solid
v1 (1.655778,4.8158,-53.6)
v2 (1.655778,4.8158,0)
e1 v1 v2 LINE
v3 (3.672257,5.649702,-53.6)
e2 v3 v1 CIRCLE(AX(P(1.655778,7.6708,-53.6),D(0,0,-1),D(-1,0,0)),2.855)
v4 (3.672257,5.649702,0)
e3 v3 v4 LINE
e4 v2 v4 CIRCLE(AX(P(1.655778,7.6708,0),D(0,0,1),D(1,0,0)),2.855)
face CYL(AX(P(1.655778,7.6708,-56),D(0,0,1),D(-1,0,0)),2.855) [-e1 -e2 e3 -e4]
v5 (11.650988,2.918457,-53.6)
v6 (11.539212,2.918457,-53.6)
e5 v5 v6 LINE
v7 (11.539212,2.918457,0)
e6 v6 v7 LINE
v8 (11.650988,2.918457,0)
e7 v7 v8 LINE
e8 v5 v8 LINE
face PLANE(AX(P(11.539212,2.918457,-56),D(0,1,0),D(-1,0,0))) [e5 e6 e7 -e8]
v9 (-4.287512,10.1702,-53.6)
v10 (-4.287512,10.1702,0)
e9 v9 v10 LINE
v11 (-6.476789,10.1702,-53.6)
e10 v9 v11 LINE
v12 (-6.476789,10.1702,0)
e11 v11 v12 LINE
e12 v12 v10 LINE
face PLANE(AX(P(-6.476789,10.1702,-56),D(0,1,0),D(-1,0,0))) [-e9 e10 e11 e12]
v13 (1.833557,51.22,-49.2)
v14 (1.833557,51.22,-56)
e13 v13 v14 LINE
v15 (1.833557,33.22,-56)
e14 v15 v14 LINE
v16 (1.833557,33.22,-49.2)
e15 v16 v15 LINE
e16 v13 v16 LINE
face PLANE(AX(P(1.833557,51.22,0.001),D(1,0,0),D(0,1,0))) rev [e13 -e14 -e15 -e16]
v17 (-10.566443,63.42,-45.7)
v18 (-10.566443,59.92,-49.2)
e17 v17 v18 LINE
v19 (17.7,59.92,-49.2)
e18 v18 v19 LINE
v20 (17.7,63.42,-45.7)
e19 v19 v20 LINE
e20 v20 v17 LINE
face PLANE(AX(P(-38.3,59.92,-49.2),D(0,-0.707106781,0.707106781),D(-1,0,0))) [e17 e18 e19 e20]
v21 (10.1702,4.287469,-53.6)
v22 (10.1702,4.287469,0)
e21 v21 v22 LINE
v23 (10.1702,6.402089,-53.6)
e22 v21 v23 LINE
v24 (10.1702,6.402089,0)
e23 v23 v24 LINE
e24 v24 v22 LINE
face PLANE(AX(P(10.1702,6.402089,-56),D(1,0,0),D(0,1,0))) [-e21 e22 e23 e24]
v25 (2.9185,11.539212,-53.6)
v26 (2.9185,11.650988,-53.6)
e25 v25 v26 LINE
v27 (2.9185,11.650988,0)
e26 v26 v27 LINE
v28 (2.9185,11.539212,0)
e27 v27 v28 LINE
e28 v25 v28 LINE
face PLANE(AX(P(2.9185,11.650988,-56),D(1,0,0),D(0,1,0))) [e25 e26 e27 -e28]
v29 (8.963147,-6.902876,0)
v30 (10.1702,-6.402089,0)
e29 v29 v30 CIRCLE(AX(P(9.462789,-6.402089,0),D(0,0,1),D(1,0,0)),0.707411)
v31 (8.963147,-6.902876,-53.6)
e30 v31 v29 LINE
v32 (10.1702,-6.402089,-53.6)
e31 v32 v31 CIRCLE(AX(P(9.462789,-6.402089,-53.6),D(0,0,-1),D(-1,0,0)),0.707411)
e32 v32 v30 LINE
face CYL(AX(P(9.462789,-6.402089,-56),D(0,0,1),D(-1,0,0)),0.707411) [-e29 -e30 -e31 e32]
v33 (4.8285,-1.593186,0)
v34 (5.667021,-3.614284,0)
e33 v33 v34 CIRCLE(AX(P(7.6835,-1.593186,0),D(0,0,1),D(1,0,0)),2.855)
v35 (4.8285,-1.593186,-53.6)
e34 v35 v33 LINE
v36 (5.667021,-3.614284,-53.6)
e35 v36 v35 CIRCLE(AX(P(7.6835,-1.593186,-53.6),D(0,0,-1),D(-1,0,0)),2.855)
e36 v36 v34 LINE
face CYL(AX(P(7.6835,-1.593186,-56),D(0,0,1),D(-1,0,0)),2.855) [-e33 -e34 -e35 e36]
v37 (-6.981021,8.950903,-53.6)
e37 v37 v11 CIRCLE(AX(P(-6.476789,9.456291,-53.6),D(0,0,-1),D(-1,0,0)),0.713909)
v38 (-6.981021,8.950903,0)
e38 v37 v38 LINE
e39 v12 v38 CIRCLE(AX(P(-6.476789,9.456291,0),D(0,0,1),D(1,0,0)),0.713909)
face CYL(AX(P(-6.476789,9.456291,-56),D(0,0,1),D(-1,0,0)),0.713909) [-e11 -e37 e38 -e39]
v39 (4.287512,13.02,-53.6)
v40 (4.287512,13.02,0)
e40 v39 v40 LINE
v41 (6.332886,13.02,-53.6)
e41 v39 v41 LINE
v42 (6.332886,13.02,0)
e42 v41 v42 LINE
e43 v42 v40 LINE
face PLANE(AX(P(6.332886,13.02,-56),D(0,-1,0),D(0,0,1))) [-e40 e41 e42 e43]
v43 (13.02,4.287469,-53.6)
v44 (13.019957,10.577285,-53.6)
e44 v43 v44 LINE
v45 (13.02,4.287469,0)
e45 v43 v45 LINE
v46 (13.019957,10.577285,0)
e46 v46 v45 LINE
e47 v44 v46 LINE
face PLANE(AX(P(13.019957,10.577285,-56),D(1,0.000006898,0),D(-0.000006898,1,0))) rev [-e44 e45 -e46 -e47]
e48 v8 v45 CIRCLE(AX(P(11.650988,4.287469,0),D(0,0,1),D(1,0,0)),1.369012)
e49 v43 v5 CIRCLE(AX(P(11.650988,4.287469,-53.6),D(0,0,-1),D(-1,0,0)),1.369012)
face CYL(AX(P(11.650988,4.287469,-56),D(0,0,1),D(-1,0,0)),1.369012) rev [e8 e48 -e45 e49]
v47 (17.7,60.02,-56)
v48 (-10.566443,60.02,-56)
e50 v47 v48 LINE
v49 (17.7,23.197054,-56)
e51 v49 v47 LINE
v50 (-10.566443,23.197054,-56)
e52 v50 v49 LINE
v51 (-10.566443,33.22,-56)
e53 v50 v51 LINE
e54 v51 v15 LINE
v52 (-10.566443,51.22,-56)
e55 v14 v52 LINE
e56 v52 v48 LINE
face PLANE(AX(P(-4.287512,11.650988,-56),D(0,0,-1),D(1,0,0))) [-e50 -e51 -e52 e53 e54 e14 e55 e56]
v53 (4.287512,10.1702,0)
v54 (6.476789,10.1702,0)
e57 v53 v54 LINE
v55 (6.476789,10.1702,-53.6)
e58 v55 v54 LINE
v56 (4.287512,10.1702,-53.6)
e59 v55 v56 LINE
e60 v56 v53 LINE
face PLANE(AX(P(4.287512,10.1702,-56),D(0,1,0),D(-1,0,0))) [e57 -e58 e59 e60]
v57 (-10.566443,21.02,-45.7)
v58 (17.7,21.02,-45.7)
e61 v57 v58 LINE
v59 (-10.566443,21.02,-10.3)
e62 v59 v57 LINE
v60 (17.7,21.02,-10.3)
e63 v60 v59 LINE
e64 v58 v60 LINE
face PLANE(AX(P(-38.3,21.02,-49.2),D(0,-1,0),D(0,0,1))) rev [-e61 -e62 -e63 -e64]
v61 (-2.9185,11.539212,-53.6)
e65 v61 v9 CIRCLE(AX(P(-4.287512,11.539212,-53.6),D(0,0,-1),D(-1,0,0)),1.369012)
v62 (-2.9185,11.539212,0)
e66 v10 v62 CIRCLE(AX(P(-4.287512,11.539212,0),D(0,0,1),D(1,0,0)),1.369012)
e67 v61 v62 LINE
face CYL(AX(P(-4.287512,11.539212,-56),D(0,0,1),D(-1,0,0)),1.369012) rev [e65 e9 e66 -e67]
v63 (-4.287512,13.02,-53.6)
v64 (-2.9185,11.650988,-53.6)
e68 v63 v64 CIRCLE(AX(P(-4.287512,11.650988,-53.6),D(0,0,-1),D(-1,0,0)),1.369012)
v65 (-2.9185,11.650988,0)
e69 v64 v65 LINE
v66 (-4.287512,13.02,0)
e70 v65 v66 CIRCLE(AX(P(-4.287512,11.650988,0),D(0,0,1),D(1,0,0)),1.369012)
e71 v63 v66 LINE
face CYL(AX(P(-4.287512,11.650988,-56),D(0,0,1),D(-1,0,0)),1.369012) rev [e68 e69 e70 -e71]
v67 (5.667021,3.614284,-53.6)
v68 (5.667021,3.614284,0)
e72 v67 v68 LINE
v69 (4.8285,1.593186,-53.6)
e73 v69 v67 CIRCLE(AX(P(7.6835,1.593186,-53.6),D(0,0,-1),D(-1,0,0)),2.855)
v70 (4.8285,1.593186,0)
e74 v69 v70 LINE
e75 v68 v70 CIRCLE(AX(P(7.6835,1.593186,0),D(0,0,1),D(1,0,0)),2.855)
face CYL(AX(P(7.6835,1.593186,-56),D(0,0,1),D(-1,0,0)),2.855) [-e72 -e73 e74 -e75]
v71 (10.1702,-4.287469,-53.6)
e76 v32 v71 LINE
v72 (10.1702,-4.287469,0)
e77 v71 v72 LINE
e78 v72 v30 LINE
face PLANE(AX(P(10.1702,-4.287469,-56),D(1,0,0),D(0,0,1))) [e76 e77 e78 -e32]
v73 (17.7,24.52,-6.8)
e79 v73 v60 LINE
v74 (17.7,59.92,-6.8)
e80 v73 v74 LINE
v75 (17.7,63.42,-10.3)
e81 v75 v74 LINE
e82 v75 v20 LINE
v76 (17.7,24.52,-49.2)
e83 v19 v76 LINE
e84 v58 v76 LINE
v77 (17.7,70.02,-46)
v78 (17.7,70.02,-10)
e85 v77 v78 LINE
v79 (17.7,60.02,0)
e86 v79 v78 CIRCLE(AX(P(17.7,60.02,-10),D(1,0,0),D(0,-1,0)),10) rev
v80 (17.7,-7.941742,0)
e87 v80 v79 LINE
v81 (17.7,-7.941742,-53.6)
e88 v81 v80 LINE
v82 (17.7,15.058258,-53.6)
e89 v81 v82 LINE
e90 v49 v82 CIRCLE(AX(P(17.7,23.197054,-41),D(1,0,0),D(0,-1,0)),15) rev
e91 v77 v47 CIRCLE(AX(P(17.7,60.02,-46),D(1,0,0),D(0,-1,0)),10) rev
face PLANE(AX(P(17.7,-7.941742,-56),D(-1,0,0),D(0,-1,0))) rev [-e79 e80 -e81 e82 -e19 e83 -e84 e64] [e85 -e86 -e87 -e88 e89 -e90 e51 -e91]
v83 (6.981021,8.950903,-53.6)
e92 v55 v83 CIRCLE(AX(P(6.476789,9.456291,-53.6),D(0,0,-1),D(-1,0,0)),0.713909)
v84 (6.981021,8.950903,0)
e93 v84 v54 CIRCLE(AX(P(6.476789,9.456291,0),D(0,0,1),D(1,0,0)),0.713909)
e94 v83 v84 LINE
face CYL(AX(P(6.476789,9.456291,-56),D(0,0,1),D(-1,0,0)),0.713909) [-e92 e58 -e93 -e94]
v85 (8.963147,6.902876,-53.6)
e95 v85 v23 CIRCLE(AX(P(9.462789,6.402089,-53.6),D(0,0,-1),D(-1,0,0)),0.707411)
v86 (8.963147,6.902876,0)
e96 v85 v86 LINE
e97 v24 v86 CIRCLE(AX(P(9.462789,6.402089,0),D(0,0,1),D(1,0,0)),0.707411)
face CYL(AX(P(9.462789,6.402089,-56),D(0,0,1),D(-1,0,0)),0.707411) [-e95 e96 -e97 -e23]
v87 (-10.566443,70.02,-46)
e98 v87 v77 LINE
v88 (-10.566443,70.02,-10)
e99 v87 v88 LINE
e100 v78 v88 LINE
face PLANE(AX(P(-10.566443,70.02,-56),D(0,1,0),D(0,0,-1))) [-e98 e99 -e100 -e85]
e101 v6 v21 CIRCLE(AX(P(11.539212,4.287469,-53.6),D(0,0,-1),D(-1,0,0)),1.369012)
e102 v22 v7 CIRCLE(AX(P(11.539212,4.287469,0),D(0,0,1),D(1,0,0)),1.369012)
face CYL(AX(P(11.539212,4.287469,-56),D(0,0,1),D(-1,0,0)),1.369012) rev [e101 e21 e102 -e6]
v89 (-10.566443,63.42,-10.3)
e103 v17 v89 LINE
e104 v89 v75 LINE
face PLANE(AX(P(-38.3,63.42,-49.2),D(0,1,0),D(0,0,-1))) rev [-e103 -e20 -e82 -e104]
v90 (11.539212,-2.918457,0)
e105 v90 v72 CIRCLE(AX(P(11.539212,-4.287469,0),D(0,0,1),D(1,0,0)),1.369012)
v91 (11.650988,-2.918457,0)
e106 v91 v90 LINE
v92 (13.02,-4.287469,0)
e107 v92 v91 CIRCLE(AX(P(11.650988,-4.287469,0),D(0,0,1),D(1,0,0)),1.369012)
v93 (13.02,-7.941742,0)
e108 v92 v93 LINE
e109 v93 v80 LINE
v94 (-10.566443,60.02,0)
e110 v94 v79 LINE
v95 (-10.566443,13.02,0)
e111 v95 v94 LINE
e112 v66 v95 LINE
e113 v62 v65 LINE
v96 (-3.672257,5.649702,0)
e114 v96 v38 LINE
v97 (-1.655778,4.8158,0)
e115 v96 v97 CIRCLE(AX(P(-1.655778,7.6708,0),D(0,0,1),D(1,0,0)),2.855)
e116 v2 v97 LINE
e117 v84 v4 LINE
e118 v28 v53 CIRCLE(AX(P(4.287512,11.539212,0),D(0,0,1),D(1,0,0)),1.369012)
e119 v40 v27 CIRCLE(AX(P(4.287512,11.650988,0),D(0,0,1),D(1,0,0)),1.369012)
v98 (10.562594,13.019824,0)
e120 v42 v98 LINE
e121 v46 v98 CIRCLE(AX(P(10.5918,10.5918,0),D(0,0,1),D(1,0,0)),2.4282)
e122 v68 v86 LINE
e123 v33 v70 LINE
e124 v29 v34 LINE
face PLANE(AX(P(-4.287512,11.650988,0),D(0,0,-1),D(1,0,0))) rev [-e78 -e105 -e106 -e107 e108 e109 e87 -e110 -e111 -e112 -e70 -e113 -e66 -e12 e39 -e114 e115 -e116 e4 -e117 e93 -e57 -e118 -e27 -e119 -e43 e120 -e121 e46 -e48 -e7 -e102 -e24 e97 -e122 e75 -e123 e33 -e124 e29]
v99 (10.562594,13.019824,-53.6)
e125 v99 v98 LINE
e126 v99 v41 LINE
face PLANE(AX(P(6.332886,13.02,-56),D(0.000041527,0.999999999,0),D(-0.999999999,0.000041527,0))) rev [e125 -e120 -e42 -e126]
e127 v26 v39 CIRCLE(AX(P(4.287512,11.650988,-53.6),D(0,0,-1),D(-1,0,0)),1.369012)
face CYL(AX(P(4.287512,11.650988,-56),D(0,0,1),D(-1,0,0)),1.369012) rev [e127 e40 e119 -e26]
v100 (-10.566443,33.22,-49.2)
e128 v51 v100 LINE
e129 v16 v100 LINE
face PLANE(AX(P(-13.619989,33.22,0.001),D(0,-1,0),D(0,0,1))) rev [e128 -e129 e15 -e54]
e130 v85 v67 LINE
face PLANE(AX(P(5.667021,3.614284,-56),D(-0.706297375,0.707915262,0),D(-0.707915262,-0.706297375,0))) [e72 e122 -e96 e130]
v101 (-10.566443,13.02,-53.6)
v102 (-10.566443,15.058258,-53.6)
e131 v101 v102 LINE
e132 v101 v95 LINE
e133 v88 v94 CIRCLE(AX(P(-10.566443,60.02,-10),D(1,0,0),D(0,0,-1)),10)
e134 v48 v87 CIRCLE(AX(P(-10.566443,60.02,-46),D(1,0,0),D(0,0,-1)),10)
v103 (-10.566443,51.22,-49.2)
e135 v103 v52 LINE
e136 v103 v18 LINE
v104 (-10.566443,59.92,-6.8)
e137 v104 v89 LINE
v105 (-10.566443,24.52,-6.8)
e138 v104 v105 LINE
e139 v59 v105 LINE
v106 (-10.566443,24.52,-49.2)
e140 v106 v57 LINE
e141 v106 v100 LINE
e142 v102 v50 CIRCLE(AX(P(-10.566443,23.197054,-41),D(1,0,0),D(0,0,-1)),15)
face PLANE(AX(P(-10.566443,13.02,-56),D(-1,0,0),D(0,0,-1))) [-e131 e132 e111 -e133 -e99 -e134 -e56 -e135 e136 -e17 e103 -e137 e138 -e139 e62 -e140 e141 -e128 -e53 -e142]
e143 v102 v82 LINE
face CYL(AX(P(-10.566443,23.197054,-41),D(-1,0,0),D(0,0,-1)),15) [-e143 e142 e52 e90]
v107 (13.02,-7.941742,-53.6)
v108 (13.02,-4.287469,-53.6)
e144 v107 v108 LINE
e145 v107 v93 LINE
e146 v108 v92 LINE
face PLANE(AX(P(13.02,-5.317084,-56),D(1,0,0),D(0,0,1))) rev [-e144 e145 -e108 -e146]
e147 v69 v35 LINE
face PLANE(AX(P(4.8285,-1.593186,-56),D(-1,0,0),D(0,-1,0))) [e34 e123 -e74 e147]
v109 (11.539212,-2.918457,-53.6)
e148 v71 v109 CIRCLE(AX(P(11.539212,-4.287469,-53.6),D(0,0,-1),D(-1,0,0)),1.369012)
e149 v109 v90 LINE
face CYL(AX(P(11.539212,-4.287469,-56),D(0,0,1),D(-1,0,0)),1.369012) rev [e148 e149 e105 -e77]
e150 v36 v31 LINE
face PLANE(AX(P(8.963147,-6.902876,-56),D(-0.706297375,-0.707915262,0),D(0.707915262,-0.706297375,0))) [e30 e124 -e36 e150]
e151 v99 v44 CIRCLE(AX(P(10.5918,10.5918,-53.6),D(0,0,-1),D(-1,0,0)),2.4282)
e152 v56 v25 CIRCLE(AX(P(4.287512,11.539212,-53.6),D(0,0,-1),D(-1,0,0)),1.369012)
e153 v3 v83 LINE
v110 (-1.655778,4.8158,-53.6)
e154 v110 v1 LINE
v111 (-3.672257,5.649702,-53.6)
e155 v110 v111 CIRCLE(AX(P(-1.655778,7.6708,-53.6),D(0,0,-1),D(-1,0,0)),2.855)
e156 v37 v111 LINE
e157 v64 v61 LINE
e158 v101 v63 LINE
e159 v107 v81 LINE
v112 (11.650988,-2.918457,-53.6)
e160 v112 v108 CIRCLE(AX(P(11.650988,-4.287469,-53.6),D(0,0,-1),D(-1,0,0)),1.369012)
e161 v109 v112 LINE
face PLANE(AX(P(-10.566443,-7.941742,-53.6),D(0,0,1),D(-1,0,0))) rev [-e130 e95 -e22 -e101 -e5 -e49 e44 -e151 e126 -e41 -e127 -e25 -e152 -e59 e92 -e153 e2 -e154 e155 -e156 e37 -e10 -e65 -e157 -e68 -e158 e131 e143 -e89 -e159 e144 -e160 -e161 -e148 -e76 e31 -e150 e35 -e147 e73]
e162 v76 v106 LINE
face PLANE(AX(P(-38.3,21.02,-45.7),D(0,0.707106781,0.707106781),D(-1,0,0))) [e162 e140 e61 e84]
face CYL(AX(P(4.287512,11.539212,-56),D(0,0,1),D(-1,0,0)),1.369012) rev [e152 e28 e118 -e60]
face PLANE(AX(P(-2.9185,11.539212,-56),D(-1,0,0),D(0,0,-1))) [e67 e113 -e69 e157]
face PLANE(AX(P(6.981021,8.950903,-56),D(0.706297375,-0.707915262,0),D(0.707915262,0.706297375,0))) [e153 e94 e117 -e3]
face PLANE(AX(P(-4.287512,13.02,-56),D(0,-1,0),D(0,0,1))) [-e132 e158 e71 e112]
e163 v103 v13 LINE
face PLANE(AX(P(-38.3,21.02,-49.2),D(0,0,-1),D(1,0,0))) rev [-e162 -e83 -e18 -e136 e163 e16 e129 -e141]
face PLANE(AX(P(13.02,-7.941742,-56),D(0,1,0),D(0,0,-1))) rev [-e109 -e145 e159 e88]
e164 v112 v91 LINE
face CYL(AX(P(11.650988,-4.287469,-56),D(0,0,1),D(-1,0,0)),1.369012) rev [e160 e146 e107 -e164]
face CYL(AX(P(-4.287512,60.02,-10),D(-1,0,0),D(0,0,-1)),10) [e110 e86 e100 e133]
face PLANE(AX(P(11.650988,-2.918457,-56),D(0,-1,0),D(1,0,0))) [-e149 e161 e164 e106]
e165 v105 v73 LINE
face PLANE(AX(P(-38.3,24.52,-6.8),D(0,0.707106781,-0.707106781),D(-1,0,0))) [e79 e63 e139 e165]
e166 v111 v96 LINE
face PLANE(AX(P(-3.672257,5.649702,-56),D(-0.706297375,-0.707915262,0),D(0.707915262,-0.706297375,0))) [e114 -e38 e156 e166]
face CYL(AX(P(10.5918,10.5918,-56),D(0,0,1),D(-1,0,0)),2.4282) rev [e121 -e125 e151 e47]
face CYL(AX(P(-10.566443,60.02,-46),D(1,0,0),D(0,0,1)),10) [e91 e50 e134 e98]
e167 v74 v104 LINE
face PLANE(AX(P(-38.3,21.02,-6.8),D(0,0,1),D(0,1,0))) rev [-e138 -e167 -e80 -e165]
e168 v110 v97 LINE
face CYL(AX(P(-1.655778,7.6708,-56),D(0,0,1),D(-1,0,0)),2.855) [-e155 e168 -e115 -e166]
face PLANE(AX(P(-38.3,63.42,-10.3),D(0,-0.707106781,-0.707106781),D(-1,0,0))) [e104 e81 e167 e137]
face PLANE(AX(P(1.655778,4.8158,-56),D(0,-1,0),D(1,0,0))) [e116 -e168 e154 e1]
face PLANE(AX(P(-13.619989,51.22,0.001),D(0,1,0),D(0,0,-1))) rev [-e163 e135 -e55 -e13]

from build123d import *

# Parameters (mm, degrees)
BOSS_EXTRUDE1_DEPTH = 56
SKETCH14_W          = 42.4
SKETCH14_H          = 42.4
CUT_EXTRUDE1_DEPTH  = 56
CHAMFER1_SIZE       = 3.5
FILLET1_R           = 10
SKETCH16_W          = 2.4
SKETCH16_H          = 23
CUT_EXTRUDE3_DEPTH  = 95.009532523
CUT_EXTRUDE4_REACH  = 93.39
SKETCH17_W          = 15.453545708
SKETCH17_H          = 18
FILLET4_R           = 15
CUT_EXTRUDE5_DEPTH  = 92.389771857


with BuildPart() as part:
    # Sketch1 → Boss-Extrude1 (new body)
    with BuildSketch(Plane.XY):
        with BuildLine():
            Line((13.02, -7.9417418), (17.7, -7.9417418))
            Line((17.7, -7.9417418), (17.7, 70.02))
            Line((17.7, 70.02), (-10.566443095, 70.02))
            Line((-10.566443095, 70.02), (-10.566443095, 13.02))
            Line((-10.566443095, 13.02), (-5.317126718, 13.02))
            Line((-5.317126718, 13.02), (-4.287512407, 13.02))
            ThreePointArc((-4.287512407, 13.02), (-3.319474451, 12.619025549), (-2.9185, 11.650987593))
            Line((-2.9185, 11.650987593), (-2.9185, 11.539212407))
            ThreePointArc((-2.9185, 11.539212407), (-3.319474451, 10.571174451), (-4.287512407, 10.1702))
            Line((-4.287512407, 10.1702), (-6.476788598, 10.1702))
            ThreePointArc((-6.476788598, 10.1702), (-7.136510935, 9.729114651), (-6.981020848, 8.950903446))
            Line((-6.981020848, 8.950903446), (-3.672257405, 5.649701928))
            ThreePointArc((-3.672257405, 5.649701928), (-2.746830644, 5.032499411), (-1.655778399, 4.8158))
            Line((-1.655778399, 4.8158), (1.655778399, 4.8158))
            ThreePointArc((1.655778399, 4.8158), (2.746830644, 5.032499411), (3.672257405, 5.649701928))
            Line((3.672257405, 5.649701928), (6.981020848, 8.950903446))
            ThreePointArc((6.981020848, 8.950903446), (7.136510935, 9.729114651), (6.476788598, 10.1702))
            Line((6.476788598, 10.1702), (4.287512407, 10.1702))
            ThreePointArc((4.287512407, 10.1702), (3.319474451, 10.571174451), (2.9185, 11.539212407))
            Line((2.9185, 11.539212407), (2.9185, 11.650987593))
            ThreePointArc((2.9185, 11.650987593), (3.319474451, 12.619025549), (4.287512407, 13.02))
            Line((4.287512407, 13.02), (6.332886163, 13.02))
            Line((6.332886163, 13.02), (10.562594215, 13.019824354))
            ThreePointArc((10.562594215, 13.019824354), (12.303594776, 12.313982883), (13.019956614, 10.577284622))
            Line((13.019956614, 10.577284622), (13.02, 4.287469289))
            ThreePointArc((13.02, 4.287469289), (12.619025549, 3.319431332), (11.650987593, 2.918456882))
            Line((11.650987593, 2.918456882), (11.539212407, 2.918456882))
            ThreePointArc((11.539212407, 2.918456882), (10.571174451, 3.319431332), (10.1702, 4.287469289))
            Line((10.1702, 4.287469289), (10.1702, 6.402089023))
            ThreePointArc((10.1702, 6.402089023), (9.733877283, 7.055496588), (8.963146507, 6.90287605))
            Line((8.963146507, 6.90287605), (5.667020993, 3.614283579))
            ThreePointArc((5.667020993, 3.614283579), (5.046449321, 2.687255303), (4.8285, 1.593185507))
            Line((4.8285, 1.593185507), (4.8285, -1.593185507))
            ThreePointArc((4.8285, -1.593185507), (5.046449321, -2.687255303), (5.667020993, -3.614283579))
            Line((5.667020993, -3.614283579), (8.963146507, -6.90287605))
            ThreePointArc((8.963146507, -6.90287605), (9.733877283, -7.055496588), (10.1702, -6.402089023))
            Line((10.1702, -6.402089023), (10.1702, -4.287469289))
            ThreePointArc((10.1702, -4.287469289), (10.571174451, -3.319431332), (11.539212407, -2.918456882))
            Line((11.539212407, -2.918456882), (11.650987593, -2.918456882))
            ThreePointArc((11.650987593, -2.918456882), (12.619025549, -3.319431332), (13.02, -4.287469289))
            Line((13.02, -4.287469289), (13.02, -5.3170836))
            Line((13.02, -5.3170836), (13.02, -7.9417418))
        make_face()
    extrude(amount=BOSS_EXTRUDE1_DEPTH)

    # Sketch14 → Cut-Extrude1 (cut)
    with BuildSketch(Plane(origin=(17.7, 0, 0), x_dir=(0, 0, -1), z_dir=(1, 0, 0))):
        with Locations((-28, 42.22)):
            Rectangle(SKETCH14_W, SKETCH14_H)
    extrude(amount=-CUT_EXTRUDE1_DEPTH, mode=Mode.SUBTRACT)

    # Chamfer1
    chamfer1_edges = [part.edges().sort_by_distance(p)[0] for p in [
        (3.566778452, 21.02, 49.2),
        (3.566778452, 63.42, 49.2),
        (3.566778452, 63.42, 6.8),
        (3.566778452, 21.02, 6.8),
    ]]
    chamfer(chamfer1_edges, length=CHAMFER1_SIZE)

    # Fillet1
    fillet1_edges = [part.edges().sort_by_distance(p)[0] for p in [
        (3.566778452, 70.02, 56),
        (3.566778452, 70.02, 0),
    ]]
    fillet(fillet1_edges, radius=FILLET1_R)

    # Sketch16 → Cut-Extrude3 (cut, through all)
    with BuildSketch(Plane(origin=(17.7, 0, 0), x_dir=(0, 0, -1), z_dir=(1, 0, 0))):
        with Locations((-54.8, 3.5582582)):
            Rectangle(SKETCH16_W, SKETCH16_H)
    extrude(amount=-CUT_EXTRUDE3_DEPTH, mode=Mode.SUBTRACT)

    # Sketch17 → Cut-Extrude4 (cut, up to next)
    with BuildSketch(Plane.XY.offset(56), mode=Mode.PRIVATE) as cut_extrude4_sk1:
        with Locations((-5.893215949, 42.22)):
            Rectangle(SKETCH17_W, SKETCH17_H)
    cut_extrude4_tool1 = extrude(cut_extrude4_sk1.sketch, amount=-CUT_EXTRUDE4_REACH, mode=Mode.PRIVATE) & part.part
    add(cut_extrude4_tool1.solids().sort_by_distance((-5.893216, 42.22, 56))[0], mode=Mode.SUBTRACT)

    # Fillet4
    # the kernel refuses this fillet: 15 mm, written as the material it takes off along each edge
    with BuildSketch(Plane(origin=(38.046989949, 15.0582582, 56), x_dir=(0, 1, 0), z_dir=(-1, 0, 0))) as fillet4_piece_1:
        with BuildLine():
            CenterArc((8.13879598, 15), FILLET4_R, 237.140119621, 32.859880379)
            Line((0, 2.4), (-0.16277592, 2.148))
            ThreePointArc((-0.16277592, 2.148), (-0.3, 1.2), (-0.3, 0))
            Line((-0.3, 0), (0, -0.3))
            Line((0, -0.3), (8.13879598, -0.3))
            Line((8.13879598, -0.3), (8.13879598, 0))
        make_face()
    extrude(amount=68.960422994, mode=Mode.SUBTRACT)


with BuildPart() as body_2:
    # Mirror2: mirrored copy
    add(part.part.mirror(Plane(origin=(-4.287512407, 11.650987593, 0), x_dir=(1, 0, 0), z_dir=(0, 0, 1))))


with BuildPart() as part_1:
    add(part.part)

    # Sketch18 → Cut-Extrude5 (cut, through all)
    with BuildSketch(Plane(origin=(0, 0, 0), x_dir=(-1, 0, 0), z_dir=(0, 0, -1))):
        Polygon((-23.608513824, 16.914250509), (-37.368077548, 16.914250509), (-37.368077548, -12.201573967), (-23.608513824, -12.201573967), (16.391486176, -12.201573967), (16.391486176, 487.798426033), (-23.608513824, 487.798426033), align=None)
    extrude(amount=-CUT_EXTRUDE5_DEPTH, mode=Mode.SUBTRACT)


solid = body_2.part
